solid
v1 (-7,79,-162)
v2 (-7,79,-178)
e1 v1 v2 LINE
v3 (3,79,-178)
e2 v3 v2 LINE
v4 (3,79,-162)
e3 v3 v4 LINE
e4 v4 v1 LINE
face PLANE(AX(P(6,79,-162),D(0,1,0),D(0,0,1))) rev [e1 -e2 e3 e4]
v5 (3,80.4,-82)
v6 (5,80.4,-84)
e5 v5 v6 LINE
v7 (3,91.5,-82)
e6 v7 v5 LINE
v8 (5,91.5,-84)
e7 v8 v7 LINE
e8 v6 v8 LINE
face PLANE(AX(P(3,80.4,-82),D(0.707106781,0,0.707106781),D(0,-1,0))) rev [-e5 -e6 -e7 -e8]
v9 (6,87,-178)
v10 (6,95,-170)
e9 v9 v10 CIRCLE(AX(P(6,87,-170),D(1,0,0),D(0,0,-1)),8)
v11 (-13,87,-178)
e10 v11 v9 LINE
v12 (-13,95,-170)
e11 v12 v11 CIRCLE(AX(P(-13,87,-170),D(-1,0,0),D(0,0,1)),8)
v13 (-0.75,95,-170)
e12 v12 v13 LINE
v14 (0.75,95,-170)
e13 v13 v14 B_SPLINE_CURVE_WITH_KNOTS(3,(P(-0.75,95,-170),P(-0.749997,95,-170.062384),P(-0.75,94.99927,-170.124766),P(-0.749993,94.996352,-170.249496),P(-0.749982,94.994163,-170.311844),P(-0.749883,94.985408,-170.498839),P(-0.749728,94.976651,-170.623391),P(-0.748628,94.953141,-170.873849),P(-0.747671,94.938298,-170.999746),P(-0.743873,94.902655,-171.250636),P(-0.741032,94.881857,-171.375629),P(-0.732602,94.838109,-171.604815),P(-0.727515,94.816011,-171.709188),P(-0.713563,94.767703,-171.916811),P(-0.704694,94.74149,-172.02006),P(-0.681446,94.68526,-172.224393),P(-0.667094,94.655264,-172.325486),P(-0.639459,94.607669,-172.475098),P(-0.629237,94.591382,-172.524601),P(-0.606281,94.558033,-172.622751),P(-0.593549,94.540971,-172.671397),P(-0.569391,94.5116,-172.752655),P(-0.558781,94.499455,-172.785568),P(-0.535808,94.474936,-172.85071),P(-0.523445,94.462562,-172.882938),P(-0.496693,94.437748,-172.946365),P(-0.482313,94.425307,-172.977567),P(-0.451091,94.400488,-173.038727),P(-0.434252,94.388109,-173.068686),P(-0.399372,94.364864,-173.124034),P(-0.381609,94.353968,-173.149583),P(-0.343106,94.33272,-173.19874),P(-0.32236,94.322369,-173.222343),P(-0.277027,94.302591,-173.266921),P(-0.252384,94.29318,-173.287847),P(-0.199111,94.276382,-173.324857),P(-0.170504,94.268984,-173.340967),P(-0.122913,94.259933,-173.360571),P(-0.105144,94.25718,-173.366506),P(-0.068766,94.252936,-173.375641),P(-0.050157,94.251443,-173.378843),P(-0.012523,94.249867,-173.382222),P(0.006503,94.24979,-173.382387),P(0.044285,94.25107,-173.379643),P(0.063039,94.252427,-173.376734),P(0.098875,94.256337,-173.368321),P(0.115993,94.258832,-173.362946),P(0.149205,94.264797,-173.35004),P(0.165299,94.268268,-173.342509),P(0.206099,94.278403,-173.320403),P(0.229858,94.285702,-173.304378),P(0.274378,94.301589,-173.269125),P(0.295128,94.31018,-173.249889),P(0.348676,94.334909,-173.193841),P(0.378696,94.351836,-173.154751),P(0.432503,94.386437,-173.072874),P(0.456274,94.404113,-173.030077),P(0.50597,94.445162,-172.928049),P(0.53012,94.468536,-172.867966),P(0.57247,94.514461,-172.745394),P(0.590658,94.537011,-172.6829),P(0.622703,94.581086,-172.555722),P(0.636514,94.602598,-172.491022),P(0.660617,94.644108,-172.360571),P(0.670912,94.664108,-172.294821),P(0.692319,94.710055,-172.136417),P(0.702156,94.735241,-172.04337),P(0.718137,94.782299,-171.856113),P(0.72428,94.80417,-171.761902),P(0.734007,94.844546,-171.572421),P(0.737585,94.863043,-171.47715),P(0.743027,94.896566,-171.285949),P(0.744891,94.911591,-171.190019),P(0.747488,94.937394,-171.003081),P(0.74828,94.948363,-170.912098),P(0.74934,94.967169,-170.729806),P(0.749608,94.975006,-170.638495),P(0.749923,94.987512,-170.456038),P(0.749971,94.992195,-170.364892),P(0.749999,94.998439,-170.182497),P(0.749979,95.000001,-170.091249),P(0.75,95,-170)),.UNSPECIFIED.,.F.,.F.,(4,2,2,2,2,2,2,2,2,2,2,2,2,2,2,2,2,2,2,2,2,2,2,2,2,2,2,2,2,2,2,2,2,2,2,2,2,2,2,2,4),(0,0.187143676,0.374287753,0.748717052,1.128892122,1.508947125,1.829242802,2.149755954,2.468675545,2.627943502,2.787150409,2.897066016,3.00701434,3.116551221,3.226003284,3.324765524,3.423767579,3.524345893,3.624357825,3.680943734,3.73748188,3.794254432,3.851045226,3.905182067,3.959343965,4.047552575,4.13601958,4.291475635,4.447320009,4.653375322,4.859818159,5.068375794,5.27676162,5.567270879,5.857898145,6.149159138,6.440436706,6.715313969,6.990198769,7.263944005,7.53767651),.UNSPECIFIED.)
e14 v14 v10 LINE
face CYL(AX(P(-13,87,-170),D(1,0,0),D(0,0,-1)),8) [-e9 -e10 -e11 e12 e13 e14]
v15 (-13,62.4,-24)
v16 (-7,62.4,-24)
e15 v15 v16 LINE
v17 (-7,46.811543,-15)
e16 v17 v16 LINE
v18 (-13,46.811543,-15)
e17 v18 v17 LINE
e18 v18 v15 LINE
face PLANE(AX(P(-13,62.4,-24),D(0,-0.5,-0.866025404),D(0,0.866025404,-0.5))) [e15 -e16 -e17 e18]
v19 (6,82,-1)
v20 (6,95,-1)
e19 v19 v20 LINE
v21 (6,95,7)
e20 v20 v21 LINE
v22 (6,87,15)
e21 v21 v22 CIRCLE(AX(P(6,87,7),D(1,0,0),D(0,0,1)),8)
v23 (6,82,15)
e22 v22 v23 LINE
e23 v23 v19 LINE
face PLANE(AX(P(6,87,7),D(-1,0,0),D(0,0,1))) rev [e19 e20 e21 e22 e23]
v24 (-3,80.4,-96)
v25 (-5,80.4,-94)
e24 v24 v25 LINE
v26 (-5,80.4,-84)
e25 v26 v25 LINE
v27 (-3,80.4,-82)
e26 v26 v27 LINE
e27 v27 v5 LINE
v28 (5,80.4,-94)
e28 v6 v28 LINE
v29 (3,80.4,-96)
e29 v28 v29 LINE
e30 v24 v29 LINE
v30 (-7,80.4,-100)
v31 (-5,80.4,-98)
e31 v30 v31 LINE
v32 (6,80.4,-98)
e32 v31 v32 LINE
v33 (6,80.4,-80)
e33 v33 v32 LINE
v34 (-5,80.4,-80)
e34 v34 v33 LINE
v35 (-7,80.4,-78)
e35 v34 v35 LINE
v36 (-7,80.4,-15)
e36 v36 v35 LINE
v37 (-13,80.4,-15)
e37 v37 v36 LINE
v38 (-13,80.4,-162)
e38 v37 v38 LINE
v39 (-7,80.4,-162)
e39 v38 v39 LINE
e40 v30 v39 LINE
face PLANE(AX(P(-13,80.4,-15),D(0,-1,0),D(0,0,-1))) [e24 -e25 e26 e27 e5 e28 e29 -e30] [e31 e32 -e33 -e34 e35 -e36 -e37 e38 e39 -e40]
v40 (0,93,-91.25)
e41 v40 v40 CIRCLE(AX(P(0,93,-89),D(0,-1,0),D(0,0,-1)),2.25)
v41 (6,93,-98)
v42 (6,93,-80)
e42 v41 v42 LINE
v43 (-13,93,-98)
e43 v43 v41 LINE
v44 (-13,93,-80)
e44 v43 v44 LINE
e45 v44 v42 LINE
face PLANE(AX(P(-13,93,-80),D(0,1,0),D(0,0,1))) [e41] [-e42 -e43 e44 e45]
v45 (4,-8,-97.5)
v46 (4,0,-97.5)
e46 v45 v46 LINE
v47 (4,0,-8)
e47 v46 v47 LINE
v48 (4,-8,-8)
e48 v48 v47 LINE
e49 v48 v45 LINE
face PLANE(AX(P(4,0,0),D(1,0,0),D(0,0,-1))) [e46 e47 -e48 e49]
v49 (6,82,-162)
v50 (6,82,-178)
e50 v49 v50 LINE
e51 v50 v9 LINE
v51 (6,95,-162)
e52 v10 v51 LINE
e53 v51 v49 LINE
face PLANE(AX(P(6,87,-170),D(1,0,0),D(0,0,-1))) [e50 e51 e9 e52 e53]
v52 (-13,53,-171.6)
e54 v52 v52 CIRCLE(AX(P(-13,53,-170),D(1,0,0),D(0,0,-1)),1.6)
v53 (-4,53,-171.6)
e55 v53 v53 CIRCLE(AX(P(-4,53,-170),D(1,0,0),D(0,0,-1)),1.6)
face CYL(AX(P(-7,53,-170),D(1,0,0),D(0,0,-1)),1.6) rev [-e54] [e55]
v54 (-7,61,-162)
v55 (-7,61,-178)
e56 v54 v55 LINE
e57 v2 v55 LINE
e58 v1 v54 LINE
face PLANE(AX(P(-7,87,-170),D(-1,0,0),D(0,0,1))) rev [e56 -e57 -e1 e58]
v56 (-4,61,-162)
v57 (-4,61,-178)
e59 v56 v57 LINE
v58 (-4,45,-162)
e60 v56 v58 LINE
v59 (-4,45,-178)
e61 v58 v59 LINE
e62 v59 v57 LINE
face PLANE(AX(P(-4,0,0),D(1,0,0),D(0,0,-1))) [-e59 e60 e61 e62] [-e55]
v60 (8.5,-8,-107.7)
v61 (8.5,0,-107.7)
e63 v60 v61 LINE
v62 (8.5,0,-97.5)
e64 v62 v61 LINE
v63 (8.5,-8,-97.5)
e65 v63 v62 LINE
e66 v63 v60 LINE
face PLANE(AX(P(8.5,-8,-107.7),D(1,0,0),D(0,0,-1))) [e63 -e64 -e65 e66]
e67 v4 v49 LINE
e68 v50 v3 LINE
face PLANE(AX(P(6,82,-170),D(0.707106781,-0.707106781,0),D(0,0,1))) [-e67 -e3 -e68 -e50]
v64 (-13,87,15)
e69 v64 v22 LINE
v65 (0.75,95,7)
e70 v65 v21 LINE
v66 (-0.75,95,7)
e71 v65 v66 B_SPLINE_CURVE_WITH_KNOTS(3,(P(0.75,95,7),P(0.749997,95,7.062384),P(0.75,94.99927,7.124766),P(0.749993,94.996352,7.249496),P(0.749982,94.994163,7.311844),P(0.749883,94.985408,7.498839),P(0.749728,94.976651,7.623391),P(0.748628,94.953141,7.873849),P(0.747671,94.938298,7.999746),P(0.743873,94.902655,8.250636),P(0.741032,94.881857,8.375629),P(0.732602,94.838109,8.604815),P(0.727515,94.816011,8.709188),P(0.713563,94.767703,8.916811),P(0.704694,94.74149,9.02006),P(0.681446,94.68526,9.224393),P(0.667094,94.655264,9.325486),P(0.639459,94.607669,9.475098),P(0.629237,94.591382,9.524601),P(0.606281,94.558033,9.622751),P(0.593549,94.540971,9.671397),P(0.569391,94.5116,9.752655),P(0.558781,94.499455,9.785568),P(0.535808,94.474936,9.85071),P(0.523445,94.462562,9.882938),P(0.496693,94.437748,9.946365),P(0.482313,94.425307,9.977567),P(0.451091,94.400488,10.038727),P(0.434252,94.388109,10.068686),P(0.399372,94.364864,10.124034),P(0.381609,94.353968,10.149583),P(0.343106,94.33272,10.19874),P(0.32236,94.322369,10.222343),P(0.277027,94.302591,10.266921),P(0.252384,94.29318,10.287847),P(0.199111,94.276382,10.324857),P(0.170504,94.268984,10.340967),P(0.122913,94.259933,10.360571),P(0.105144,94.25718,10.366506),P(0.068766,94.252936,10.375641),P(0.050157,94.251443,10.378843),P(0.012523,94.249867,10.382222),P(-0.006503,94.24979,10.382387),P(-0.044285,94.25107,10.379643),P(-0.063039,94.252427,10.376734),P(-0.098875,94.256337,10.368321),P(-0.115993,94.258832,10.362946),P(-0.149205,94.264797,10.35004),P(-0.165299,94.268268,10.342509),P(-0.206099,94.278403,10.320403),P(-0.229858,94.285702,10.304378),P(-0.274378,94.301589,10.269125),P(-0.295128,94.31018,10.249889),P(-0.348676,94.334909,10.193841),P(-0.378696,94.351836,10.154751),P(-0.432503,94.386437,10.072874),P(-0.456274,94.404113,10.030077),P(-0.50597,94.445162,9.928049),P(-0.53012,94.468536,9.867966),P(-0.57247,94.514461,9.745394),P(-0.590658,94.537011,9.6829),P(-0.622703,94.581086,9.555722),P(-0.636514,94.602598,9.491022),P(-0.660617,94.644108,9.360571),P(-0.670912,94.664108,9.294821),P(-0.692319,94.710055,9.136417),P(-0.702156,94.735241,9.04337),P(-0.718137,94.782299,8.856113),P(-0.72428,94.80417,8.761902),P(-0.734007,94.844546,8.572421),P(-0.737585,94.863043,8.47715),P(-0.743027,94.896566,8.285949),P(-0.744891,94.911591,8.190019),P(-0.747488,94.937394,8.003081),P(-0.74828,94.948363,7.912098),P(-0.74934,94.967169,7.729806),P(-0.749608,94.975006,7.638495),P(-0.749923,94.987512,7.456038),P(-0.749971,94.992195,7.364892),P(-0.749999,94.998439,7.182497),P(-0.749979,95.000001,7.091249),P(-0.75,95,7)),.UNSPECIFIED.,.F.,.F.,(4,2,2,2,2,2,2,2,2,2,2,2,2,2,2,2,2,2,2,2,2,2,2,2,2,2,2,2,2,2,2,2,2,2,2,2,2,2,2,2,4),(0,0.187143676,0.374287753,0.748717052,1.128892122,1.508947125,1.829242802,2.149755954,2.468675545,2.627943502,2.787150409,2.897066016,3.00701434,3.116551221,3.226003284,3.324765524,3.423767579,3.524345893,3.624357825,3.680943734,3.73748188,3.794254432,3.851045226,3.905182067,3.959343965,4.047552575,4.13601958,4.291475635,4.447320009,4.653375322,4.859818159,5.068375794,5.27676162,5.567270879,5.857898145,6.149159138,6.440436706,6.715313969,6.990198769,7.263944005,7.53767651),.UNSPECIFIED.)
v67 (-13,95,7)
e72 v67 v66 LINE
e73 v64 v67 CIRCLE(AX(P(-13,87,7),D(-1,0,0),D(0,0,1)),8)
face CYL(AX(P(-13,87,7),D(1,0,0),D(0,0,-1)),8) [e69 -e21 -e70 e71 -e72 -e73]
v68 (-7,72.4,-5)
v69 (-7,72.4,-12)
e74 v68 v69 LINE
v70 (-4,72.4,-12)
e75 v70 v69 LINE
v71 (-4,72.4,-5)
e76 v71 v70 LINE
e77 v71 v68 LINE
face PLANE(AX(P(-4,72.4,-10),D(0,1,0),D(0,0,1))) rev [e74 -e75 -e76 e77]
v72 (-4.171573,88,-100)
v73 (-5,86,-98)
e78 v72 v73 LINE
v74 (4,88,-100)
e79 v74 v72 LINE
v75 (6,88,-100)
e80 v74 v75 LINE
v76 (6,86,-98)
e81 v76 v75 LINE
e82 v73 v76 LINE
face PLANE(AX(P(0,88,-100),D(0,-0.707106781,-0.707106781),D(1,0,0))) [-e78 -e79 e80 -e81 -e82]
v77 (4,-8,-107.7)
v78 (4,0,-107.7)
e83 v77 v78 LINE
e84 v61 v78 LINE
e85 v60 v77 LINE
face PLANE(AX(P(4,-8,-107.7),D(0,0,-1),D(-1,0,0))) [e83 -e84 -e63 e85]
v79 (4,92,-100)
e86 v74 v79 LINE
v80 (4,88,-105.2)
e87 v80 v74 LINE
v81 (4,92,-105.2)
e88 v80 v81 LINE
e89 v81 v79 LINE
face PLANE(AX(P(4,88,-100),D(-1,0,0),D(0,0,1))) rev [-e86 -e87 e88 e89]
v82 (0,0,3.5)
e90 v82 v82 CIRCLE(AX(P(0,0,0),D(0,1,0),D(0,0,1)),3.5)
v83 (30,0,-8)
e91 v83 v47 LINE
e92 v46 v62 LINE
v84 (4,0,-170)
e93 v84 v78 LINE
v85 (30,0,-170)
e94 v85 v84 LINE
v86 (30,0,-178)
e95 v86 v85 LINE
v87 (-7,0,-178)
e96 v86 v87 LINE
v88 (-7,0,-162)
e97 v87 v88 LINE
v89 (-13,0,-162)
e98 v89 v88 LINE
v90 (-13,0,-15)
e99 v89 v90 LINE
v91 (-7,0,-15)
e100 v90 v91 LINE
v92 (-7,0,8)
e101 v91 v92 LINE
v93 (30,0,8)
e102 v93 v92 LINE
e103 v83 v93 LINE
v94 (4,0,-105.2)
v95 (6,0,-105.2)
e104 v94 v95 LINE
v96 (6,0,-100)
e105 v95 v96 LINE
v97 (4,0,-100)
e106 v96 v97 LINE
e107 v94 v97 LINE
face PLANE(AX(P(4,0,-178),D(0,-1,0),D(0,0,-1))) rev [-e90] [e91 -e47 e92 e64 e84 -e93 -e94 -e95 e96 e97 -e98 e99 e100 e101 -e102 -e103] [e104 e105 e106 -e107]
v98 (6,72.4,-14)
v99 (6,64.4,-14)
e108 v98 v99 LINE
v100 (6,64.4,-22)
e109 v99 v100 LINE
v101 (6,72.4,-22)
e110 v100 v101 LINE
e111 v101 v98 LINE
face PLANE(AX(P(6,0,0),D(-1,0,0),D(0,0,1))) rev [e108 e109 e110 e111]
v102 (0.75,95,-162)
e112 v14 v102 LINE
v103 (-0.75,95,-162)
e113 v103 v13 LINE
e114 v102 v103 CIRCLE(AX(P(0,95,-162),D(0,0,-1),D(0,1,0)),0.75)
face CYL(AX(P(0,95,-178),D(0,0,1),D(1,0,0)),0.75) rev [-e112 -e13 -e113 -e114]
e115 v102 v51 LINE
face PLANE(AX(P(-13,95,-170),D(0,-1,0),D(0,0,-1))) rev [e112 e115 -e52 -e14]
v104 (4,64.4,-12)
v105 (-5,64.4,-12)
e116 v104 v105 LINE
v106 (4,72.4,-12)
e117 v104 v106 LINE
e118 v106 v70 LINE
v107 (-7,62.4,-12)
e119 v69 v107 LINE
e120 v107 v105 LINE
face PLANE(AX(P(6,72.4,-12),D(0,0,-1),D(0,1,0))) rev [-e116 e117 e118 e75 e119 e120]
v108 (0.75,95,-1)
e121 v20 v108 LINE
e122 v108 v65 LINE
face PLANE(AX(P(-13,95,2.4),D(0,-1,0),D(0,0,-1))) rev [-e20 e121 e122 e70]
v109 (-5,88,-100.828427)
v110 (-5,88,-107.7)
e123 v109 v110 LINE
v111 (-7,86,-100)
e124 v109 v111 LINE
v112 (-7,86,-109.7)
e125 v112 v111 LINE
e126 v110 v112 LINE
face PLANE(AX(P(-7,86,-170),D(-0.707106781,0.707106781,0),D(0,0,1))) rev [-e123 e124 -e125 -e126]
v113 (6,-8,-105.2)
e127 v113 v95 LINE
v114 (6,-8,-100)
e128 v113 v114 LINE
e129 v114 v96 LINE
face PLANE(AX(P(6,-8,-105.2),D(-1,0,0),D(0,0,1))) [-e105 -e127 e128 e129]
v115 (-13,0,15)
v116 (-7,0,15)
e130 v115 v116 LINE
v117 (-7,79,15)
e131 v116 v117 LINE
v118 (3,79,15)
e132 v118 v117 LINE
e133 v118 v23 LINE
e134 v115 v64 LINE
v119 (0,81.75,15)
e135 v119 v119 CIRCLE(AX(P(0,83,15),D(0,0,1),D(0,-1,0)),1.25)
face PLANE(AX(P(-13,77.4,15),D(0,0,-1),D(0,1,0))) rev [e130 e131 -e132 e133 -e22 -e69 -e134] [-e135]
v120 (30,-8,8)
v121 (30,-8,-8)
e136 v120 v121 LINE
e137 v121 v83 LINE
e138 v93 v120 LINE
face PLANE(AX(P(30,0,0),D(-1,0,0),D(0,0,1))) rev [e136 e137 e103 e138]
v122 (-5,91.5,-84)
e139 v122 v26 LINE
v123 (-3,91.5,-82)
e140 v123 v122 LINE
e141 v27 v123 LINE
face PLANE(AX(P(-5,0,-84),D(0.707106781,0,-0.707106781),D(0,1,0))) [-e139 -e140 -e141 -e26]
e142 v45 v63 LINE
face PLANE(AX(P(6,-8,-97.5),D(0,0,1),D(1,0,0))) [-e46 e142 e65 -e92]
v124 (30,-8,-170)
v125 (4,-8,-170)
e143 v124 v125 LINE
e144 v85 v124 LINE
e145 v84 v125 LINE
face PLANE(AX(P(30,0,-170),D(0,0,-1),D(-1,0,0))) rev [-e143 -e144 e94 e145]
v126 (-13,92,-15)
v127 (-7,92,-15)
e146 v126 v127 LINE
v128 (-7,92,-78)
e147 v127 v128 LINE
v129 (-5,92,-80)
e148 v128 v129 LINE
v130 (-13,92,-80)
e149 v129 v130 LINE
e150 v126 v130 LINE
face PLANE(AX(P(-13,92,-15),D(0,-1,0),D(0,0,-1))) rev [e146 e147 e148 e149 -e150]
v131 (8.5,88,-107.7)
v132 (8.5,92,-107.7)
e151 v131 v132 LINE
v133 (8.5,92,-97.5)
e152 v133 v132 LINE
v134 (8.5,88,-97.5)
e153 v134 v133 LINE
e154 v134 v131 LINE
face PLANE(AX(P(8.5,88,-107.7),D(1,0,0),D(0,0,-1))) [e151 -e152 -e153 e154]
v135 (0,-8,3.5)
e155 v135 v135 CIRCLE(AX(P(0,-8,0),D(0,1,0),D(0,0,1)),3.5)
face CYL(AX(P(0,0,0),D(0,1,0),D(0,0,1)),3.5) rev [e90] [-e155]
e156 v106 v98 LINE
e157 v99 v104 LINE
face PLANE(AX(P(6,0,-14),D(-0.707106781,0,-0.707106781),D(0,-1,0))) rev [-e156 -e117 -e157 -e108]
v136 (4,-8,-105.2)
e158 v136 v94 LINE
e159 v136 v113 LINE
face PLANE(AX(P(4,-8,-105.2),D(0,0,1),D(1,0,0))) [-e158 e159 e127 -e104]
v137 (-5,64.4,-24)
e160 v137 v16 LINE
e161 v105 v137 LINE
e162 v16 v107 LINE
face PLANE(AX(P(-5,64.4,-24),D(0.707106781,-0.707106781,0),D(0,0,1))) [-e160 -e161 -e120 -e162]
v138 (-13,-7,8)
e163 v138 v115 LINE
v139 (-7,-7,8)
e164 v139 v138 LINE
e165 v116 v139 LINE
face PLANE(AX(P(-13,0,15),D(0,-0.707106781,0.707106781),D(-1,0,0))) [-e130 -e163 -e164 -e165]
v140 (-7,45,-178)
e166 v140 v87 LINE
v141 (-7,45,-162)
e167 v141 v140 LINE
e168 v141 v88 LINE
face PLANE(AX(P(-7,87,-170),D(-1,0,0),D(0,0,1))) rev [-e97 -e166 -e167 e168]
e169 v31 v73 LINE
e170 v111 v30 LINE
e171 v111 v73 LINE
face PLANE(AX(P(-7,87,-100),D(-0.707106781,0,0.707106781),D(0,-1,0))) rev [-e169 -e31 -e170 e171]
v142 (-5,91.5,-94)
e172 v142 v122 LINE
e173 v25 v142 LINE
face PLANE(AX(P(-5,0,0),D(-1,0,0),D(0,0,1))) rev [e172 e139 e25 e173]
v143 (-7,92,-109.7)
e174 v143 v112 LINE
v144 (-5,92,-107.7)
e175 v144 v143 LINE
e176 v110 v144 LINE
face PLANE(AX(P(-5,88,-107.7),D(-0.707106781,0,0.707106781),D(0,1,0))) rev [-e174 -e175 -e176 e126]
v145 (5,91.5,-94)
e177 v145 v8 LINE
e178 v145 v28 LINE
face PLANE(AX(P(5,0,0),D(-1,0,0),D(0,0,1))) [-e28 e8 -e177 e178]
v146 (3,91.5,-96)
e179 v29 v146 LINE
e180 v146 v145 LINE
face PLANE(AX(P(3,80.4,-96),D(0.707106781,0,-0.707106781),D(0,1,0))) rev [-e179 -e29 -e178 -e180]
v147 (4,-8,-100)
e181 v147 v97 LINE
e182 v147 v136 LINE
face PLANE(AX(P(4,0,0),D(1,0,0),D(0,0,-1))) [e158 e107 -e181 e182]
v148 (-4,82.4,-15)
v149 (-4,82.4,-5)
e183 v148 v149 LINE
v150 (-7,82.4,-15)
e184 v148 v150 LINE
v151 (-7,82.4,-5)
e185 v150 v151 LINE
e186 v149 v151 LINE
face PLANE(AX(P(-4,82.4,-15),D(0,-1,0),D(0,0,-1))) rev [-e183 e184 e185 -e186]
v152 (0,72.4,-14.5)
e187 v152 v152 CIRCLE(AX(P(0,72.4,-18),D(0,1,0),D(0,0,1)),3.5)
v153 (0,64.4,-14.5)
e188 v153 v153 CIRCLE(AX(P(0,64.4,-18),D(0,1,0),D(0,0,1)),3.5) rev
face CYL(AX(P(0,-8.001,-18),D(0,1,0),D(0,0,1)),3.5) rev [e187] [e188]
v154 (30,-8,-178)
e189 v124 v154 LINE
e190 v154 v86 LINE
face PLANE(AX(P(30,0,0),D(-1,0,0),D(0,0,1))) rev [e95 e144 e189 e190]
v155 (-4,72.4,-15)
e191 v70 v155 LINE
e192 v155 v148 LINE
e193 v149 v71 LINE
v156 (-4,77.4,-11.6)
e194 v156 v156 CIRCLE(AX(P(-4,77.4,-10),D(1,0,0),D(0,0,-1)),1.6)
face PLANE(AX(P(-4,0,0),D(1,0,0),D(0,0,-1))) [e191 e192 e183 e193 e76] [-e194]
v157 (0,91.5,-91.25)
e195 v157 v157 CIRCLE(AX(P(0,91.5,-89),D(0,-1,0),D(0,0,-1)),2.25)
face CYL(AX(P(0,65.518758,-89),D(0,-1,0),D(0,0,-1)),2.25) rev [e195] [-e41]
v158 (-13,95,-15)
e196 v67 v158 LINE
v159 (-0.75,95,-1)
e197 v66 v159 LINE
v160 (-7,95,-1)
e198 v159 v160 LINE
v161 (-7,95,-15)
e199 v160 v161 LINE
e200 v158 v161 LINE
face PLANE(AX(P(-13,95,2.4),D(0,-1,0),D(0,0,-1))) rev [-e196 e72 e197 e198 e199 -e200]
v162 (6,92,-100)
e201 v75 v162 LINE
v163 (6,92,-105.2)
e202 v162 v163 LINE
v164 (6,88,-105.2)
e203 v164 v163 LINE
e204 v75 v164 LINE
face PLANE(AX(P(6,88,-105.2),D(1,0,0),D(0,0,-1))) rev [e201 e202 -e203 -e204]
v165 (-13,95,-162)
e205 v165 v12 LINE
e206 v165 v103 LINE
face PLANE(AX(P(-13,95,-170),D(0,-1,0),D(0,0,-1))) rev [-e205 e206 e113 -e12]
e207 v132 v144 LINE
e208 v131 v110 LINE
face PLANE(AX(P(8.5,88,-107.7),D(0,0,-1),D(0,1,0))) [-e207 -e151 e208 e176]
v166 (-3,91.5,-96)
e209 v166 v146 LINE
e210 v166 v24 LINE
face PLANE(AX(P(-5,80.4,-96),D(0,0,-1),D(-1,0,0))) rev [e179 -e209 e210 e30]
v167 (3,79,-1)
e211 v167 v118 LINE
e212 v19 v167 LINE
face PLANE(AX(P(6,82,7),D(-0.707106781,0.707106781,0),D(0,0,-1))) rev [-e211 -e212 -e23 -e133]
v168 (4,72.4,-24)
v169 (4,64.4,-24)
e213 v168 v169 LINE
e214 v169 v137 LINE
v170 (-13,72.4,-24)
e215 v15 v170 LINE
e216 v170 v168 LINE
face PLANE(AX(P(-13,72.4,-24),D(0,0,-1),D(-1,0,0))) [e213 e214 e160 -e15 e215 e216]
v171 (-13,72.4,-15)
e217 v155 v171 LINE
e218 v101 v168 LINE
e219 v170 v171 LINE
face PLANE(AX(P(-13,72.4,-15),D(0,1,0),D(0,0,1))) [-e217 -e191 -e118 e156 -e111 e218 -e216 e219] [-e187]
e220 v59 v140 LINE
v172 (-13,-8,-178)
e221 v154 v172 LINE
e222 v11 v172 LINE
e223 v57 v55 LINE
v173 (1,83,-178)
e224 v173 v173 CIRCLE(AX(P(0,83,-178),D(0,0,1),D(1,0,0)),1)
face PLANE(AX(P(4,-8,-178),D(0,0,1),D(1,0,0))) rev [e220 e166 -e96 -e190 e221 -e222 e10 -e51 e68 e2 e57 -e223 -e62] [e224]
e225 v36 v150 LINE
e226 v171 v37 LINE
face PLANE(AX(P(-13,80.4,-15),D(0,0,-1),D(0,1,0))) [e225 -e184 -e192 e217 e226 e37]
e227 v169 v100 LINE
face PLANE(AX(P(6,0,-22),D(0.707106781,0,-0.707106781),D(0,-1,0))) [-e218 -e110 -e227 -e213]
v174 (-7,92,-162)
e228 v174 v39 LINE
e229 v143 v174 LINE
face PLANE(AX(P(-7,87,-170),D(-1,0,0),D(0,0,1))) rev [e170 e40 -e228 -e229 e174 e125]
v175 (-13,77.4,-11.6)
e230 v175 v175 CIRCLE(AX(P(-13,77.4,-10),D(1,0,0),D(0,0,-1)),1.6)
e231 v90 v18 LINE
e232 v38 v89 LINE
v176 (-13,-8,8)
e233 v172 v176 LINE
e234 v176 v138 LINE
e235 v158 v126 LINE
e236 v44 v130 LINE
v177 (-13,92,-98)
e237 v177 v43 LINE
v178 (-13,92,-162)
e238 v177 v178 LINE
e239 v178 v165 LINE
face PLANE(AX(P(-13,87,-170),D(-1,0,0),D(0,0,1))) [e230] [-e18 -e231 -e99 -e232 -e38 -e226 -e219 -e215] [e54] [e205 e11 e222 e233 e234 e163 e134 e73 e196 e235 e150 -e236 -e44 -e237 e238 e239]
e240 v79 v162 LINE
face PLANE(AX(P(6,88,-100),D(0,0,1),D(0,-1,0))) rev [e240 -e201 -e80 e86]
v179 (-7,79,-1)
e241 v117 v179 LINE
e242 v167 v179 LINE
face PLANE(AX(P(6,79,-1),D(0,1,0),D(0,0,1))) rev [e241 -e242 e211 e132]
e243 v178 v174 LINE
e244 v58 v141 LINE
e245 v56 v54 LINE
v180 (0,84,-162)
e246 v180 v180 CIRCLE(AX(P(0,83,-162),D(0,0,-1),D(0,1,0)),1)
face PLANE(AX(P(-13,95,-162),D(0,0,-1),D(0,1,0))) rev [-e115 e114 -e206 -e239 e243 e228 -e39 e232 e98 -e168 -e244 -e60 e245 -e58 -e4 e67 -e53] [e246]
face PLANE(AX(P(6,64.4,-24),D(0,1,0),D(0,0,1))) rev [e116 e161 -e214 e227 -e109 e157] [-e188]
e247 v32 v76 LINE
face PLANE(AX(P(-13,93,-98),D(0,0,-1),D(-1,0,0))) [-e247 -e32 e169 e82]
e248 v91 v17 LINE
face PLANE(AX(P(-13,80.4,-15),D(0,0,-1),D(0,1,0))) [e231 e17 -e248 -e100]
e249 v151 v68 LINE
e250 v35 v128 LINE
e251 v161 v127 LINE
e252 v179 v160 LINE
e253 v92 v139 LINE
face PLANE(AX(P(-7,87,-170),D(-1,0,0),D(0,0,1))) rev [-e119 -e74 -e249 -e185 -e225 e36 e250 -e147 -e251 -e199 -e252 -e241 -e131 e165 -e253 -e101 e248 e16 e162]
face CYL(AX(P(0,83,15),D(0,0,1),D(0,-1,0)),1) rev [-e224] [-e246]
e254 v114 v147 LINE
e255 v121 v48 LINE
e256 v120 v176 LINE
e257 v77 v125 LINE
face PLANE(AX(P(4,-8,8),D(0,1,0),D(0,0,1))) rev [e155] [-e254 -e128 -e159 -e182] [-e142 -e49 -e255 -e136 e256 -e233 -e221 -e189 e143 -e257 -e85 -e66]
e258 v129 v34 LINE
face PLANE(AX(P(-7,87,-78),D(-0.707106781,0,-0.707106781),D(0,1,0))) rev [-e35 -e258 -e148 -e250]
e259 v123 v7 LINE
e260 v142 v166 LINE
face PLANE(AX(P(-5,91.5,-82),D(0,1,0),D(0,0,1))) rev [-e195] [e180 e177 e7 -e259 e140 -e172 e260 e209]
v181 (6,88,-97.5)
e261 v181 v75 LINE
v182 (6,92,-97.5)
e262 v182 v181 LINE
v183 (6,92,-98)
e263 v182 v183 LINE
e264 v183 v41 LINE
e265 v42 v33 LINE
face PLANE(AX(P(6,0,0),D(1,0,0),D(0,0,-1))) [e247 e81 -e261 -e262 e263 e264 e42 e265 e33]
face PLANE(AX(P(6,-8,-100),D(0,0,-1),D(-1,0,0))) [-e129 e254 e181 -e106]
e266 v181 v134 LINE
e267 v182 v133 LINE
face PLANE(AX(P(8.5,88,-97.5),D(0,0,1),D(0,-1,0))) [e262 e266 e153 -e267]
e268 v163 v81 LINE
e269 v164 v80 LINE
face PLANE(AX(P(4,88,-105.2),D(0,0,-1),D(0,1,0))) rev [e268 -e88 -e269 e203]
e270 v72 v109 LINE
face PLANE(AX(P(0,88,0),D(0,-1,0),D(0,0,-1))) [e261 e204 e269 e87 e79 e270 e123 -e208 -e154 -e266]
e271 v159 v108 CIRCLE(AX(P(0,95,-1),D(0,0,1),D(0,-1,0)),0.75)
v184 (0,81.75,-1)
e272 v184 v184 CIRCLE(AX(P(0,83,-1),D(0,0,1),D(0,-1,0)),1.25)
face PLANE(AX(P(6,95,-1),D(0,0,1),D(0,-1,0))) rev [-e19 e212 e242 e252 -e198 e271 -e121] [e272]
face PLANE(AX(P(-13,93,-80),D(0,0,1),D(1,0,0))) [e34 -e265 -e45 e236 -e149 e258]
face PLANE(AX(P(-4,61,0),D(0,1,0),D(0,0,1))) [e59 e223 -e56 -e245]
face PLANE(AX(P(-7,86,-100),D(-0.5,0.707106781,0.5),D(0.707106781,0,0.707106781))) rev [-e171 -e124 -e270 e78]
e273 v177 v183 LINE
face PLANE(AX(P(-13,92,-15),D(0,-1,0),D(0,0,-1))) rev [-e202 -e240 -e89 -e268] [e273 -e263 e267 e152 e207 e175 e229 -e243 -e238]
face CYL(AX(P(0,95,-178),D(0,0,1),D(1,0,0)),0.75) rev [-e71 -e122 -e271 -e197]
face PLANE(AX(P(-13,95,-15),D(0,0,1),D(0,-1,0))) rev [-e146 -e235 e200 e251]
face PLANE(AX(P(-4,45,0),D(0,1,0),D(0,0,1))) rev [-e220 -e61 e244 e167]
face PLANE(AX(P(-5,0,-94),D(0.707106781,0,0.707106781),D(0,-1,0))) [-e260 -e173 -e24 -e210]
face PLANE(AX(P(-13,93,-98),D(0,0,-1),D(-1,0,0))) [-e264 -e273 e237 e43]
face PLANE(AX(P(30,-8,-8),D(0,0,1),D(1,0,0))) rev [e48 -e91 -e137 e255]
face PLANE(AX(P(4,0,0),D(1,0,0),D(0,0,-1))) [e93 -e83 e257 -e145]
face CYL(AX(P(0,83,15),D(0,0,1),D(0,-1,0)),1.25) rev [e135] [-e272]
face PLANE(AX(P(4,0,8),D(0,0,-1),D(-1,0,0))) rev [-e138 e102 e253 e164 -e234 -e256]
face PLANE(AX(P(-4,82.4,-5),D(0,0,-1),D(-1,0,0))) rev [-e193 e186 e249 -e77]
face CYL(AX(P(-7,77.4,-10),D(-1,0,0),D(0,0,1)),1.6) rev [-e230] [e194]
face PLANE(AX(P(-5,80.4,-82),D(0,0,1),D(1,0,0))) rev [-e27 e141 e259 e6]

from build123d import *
from build123d.topology import SkipClean

# Parameters (mm, degrees)
BOSS_EXTRUDE1_DEPTH             = 4
SKETCH2_W                       = 8
SKETCH2_H                       = 8
BOSS_EXTRUDE2_DEPTH             = 26
BOSS_EXTRUDE3_DEPTH             = 7
BOSS_EXTRUDE4_DEPTH             = 6
BOSS_EXTRUDE6_DEPTH             = 3
BOSS_EXTRUDE7_DEPTH             = 3
F_7_0MM_DOWEL_HOLE1_D           = 7
SKETCH6_W                       = 1.6
SKETCH6_H                       = 6
SKETCH9_W                       = 1.6
SKETCH9_H                       = 37
M3_CLEARANCE_HOLE4_D            = 3.2
BOSS_EXTRUDE8_DEPTH             = 8
BOSS_EXTRUDE9_DEPTH             = 6
SKETCH15_W                      = 12
SKETCH15_H                      = 8
BOSS_EXTRUDE10_DEPTH            = 13
CHAMFER1_SIZE                   = 2
CUT_EXTRUDE1_REACH              = 199.606
SKETCH16_R                      = 3.5
CHAMFER2_SIZE                   = 2
BOSS_EXTRUDE11_START            = 13
BOSS_EXTRUDE11_DEPTH            = 13
CUT_EXTRUDE2_DEPTH              = 218.195764231
CUT_EXTRUDE2_DEPTH_BACK         = 218.195764231
SKETCH18_R                      = 0.75
TAP_DRILL_FOR_M3X0_5_TAP1_D     = 2.5
TAP_DRILL_FOR_M3X0_5_TAP1_DEPTH = 16
F_2_0MM_DOWEL_HOLE4_D           = 2
CHAMFER3_SIZE                   = 3
BOSS_EXTRUDE12_START            = -13
SKETCH24_W                      = 18
SKETCH24_H                      = 12.6
BOSS_EXTRUDE12_DEPTH            = 19
SKETCH25_W                      = 14
SKETCH25_H                      = 11.1
CUT_EXTRUDE3_DEPTH              = 5
CHAMFER4_SIZE                   = 2
SKETCH26_W                      = 2.25
SKETCH26_H                      = 1.5
SKETCH27_W                      = 15.5
SKETCH27_H                      = 10.2
SKETCH27_W_2                    = 2
SKETCH27_H_2                    = 5.2
BOSS_EXTRUDE13_DEPTH            = 4
CHAMFER5_SIZE                   = 2
CHAMFER6_SIZE                   = 7


with BuildPart() as part:
    # Sketch1 → Boss-Extrude1 (new body)
    with BuildSketch(Plane(origin=(0, 0, 0), x_dir=(0, 0, -1), z_dir=(1, 0, 0))):
        Polygon((0, 0), (-8, 0), (-8, -8), (178, -8), (178, 0), (170, 0), align=None)
    extrude(amount=BOSS_EXTRUDE1_DEPTH)

    # Sketch2 → Boss-Extrude2 (add)
    with BuildSketch(Plane(origin=(4, 0, 0), x_dir=(0, 0, -1), z_dir=(1, 0, 0))):
        Polygon((-8, -8), (0, -8), (8, -8), (8, 0), (0, 0), (-8, 0), align=None)
        with Locations((174, -4)):
            Rectangle(SKETCH2_W, SKETCH2_H)
    extrude(amount=BOSS_EXTRUDE2_DEPTH)

    # Sketch1<2> → Boss-Extrude3 (add)
    with BuildSketch(Plane(origin=(0, 0, 0), x_dir=(0, 0, -1), z_dir=(1, 0, 0))):
        Polygon((0, 0), (-8, 0), (-8, -8), (178, -8), (178, 0), (170, 0), align=None)
    extrude(amount=-BOSS_EXTRUDE3_DEPTH)

    # Sketch4 → Boss-Extrude4 (add)
    with BuildSketch(Plane.ZY.offset(7)):
        with BuildLine():
            Line((-178, 0), (-178, 87))
            ThreePointArc((-178, 87), (-175.656854249, 92.656854249), (-170, 95))
            Line((-170, 95), (-162, 95))
            Line((-162, 95), (-162, 92))
            Line((-162, 92), (-15, 92))
            Line((-15, 92), (-15, 95))
            Line((-15, 95), (2.4, 95))
            Line((2.4, 95), (7, 95))
            ThreePointArc((7, 95), (12.656854249, 92.656854249), (15, 87))
            Line((15, 87), (15, 77.4))
            Line((15, 77.4), (15, 2.4))
            Line((15, 2.4), (15, 0))
            Line((15, 0), (8, 0))
            Line((8, 0), (8, -8))
            Line((8, -8), (-178, -8))
            Line((-178, -8), (-178, 0))
        make_face()
        Polygon((-15, 2.4), (-15, 0), (-162, 0), (-162, 80.4), (-15, 80.4), (-15, 77.4), align=None, mode=Mode.SUBTRACT)
    extrude(amount=BOSS_EXTRUDE4_DEPTH)

    # Sketch10 → Boss-Extrude6 (add)
    with BuildSketch(Plane(origin=(-7, 0, 0), x_dir=(0, 0, -1), z_dir=(1, 0, 0))):
        Polygon((15, 82.4), (5, 82.4), (5, 72.4), (10, 72.4), (15, 72.4), (15, 77.4), align=None)
    extrude(amount=BOSS_EXTRUDE6_DEPTH)

    # Sketch10<3> → Boss-Extrude7 (add)
    with BuildSketch(Plane(origin=(-7, 0, 0), x_dir=(0, 0, -1), z_dir=(1, 0, 0))):
        Polygon((170, 61), (178, 61), (178, 53), (178, 45), (162, 45), (162, 61), align=None)
    extrude(amount=BOSS_EXTRUDE7_DEPTH)

    # Ø7.0mm Dowel Hole1 (through all)
    with Locations(Plane.ZX):
        with Locations((0, 0)):
            Hole(F_7_0MM_DOWEL_HOLE1_D / 2)

    # Sketch6 → M3 Clearance Hole2 (revolve, cut)
    with BuildSketch(Plane(origin=(-7, 53, -170), x_dir=(0, 0, -1), z_dir=(0, 1, 0))):
        with Locations((0.8, 3)):
            Rectangle(SKETCH6_W, SKETCH6_H)
    revolve(axis=Axis((-0.65, 53, -170), (-1, 0, 0)), mode=Mode.SUBTRACT)

    # Sketch9 → M3 Clearance Hole3 (revolve, cut)
    with BuildSketch(Plane(origin=(-7, 77.4, -10), x_dir=(0, 0, 1), z_dir=(0, 1, 0))):
        with Locations((0.8, 18.5)):
            Rectangle(SKETCH9_W, SKETCH9_H)
    revolve(axis=Axis((-13.35, 77.4, -10), (1, 0, 0)), mode=Mode.SUBTRACT)

    # M3 Clearance Hole4 (through all)
    with Locations(Plane(origin=(0, 0, 0), x_dir=(0, 0, -1), z_dir=(1, 0, 0))):
        with Locations((10, 77.4), (170, 53)):
            Hole(M3_CLEARANCE_HOLE4_D / 2)

    # Sketch13 → Boss-Extrude8 (add)
    with BuildSketch(Plane(origin=(0, 0, 0), x_dir=(1, 0, 0), z_dir=(0, 1, 0))):
        Polygon((6, 107.7), (8.5, 107.7), (8.5, 97.5), (6, 97.5), (4, 97.5), (4, 100), (6, 100), (6, 105.2), (4, 105.2), (4, 107.7), align=None)
    extrude(amount=-BOSS_EXTRUDE8_DEPTH)

    # Sketch14 → Boss-Extrude9 (add)
    with BuildSketch(Plane(origin=(-7, 0, 0), x_dir=(0, 0, -1), z_dir=(1, 0, 0))):
        Polygon((15, 72.4), (24, 72.4), (24, 62.4), (15, 46.811542732), align=None)
    extrude(amount=-BOSS_EXTRUDE9_DEPTH)

    # Sketch15 → Boss-Extrude10 (add)
    with BuildSketch(Plane(origin=(-7, 0, 0), x_dir=(0, 0, -1), z_dir=(1, 0, 0))):
        with Locations((18, 68.4)):
            Rectangle(SKETCH15_W, SKETCH15_H)
    extrude(amount=BOSS_EXTRUDE10_DEPTH)

    # Chamfer1
    chamfer1_edges = [part.edges().sort_by_distance(p)[0] for p in [
        (-7, 64.4, -18),
    ]]
    chamfer(chamfer1_edges, length=CHAMFER1_SIZE)

    # Sketch16 → Cut-Extrude1 (cut, up to next)
    with BuildSketch(Plane(origin=(0, 72.4, 0), x_dir=(1, 0, 0), z_dir=(0, 1, 0)), mode=Mode.PRIVATE) as cut_extrude1_sk1:
        with Locations(Location((0, 18, 0), (0, 0, 270))):
            Circle(SKETCH16_R)
    cut_extrude1_tool1 = extrude(cut_extrude1_sk1.sketch, amount=-CUT_EXTRUDE1_REACH, mode=Mode.PRIVATE) & part.part
    add(cut_extrude1_tool1.solids().sort_by_distance((0, 72.4, -18))[0], mode=Mode.SUBTRACT)

    # Chamfer2
    chamfer2_edges = [part.edges().sort_by_distance(p)[0] for p in [
        (6, 68.4, -24),
        (6, 68.4, -12),
    ]]
    chamfer(chamfer2_edges, length=CHAMFER2_SIZE)

    # Sketch17 → Boss-Extrude11 (add)
    with BuildSketch(Plane(origin=(-7, 0, 0), x_dir=(0, 0, -1), z_dir=(1, 0, 0)).offset(BOSS_EXTRUDE11_START)):
        with BuildLine():
            Line((1, 95), (1, 79))
            Line((1, 79), (-15, 79))
            Line((-15, 79), (-15, 87))
            ThreePointArc((-15, 87), (-12.656854249, 92.656854249), (-7, 95))
            Line((-7, 95), (1, 95))
        make_face()
        with BuildLine():
            Line((170, 95), (162, 95))
            Line((162, 95), (162, 79))
            Line((162, 79), (178, 79))
            Line((178, 79), (178, 87))
            ThreePointArc((178, 87), (175.656854249, 92.656854249), (170, 95))
        make_face()
    extrude(amount=-BOSS_EXTRUDE11_DEPTH)

    # Sketch18 → Cut-Extrude2 (cut, two sides: drawn at the far end of the back side and taken through both)
    with BuildSketch(Plane.XY.offset(15).offset(-CUT_EXTRUDE2_DEPTH_BACK)):
        with Locations((0, 95)):
            Circle(SKETCH18_R)
    extrude(amount=CUT_EXTRUDE2_DEPTH + CUT_EXTRUDE2_DEPTH_BACK, mode=Mode.SUBTRACT)

    # Tap Drill for M3x0.5 Tap1
    with Locations(Plane(origin=(0, 83, 15), x_dir=(0, 1, 0), z_dir=(0, 0, 1))):
        with Locations((0, 0)):
            Hole(TAP_DRILL_FOR_M3X0_5_TAP1_D / 2, depth=TAP_DRILL_FOR_M3X0_5_TAP1_DEPTH)

    # Ø2.0mm Dowel Hole4 (through all)
    with Locations(Plane(origin=(0, 83, 15), x_dir=(0, 1, 0), z_dir=(0, 0, 1))):
        with Locations((0, 0)):
            Hole(F_2_0MM_DOWEL_HOLE4_D / 2)

    # Chamfer3
    chamfer3_edges = [part.edges().sort_by_distance(p)[0] for p in [
        (6, 79, 7),
        (6, 79, -170),
    ]]
    chamfer(chamfer3_edges, length=CHAMFER3_SIZE)

    # Sketch24 → Boss-Extrude12 (add)
    with SkipClean():  # the faces are left unmerged after this step: merging them gives an invalid solid
        with BuildSketch(Plane(origin=(0, 0, 0), x_dir=(0, 0, -1), z_dir=(1, 0, 0)).offset(BOSS_EXTRUDE12_START)):
            with Locations((89, 86.7)):
                Rectangle(SKETCH24_W, SKETCH24_H)
        extrude(amount=BOSS_EXTRUDE12_DEPTH)

    # Sketch25 → Cut-Extrude3 (cut, symmetric)
    with SkipClean():  # the faces are left unmerged after this step: merging them gives an invalid solid
        with BuildSketch(Plane(origin=(0, 0, 0), x_dir=(0, 0, -1), z_dir=(1, 0, 0))):
            with Locations((89, 85.95)):
                Rectangle(SKETCH25_W, SKETCH25_H)
        extrude(amount=CUT_EXTRUDE3_DEPTH, both=True, mode=Mode.SUBTRACT)

    # Chamfer4
    chamfer4_edges = [part.edges().sort_by_distance(p)[0] for p in [
        (-7, 86.2, -80),
        (-7, 86.2, -98),
        (-5, 85.95, -82),
        (-5, 85.95, -96),
        (5, 85.95, -82),
        (5, 85.95, -96),
    ]]
    chamfer(chamfer4_edges, length=CHAMFER4_SIZE)

    # Sketch26 → Cut-Revolve1 (revolve, cut)
    with SkipClean():  # the faces are left unmerged after this step: merging them gives an invalid solid
        with BuildSketch(Plane(origin=(0, 0, 0), x_dir=(0, 0, -1), z_dir=(1, 0, 0)), mode=Mode.PRIVATE) as cut_revolve1_sk:
            with Locations((87.875, 92.25)):
                Rectangle(SKETCH26_W, SKETCH26_H)
        revolve(cut_revolve1_sk.sketch.rotate(Axis((0, 65.518758018, -89), (0, 1, 0)), 180), axis=Axis((0, 65.518758018, -89), (0, 1, 0)), mode=Mode.SUBTRACT)

    # Sketch27 → Boss-Extrude13 (add)
    with SkipClean():  # the faces are left unmerged after this step: merging them gives an invalid solid
        with BuildSketch(Plane(origin=(0, 92, 0), x_dir=(1, 0, 0), z_dir=(0, 1, 0))):
            with Locations((0.75, 102.6)):
                Rectangle(SKETCH27_W, SKETCH27_H)
            with Locations((5, 102.6)):
                Rectangle(SKETCH27_W_2, SKETCH27_H_2, mode=Mode.SUBTRACT)
        extrude(amount=-BOSS_EXTRUDE13_DEPTH)

    # Chamfer5
    chamfer5_edges = [part.edges().sort_by_distance(p)[0] for p in [
        (-6, 88, -99),
        (-7, 88, -103.85),
        (-7, 90, -107.7),
        (0.5, 88, -98),
    ]]
    chamfer(chamfer5_edges, length=CHAMFER5_SIZE - 0.0001)  # a hair under: the kernel refuses the full size

    # Chamfer6
    chamfer6_edges = [part.edges().sort_by_distance(p)[0] for p in [
        (-10, 0, 8),
    ]]
    chamfer(chamfer6_edges, length=CHAMFER6_SIZE - 0.0001)  # a hair under: the kernel refuses the full size


solid = part.part
